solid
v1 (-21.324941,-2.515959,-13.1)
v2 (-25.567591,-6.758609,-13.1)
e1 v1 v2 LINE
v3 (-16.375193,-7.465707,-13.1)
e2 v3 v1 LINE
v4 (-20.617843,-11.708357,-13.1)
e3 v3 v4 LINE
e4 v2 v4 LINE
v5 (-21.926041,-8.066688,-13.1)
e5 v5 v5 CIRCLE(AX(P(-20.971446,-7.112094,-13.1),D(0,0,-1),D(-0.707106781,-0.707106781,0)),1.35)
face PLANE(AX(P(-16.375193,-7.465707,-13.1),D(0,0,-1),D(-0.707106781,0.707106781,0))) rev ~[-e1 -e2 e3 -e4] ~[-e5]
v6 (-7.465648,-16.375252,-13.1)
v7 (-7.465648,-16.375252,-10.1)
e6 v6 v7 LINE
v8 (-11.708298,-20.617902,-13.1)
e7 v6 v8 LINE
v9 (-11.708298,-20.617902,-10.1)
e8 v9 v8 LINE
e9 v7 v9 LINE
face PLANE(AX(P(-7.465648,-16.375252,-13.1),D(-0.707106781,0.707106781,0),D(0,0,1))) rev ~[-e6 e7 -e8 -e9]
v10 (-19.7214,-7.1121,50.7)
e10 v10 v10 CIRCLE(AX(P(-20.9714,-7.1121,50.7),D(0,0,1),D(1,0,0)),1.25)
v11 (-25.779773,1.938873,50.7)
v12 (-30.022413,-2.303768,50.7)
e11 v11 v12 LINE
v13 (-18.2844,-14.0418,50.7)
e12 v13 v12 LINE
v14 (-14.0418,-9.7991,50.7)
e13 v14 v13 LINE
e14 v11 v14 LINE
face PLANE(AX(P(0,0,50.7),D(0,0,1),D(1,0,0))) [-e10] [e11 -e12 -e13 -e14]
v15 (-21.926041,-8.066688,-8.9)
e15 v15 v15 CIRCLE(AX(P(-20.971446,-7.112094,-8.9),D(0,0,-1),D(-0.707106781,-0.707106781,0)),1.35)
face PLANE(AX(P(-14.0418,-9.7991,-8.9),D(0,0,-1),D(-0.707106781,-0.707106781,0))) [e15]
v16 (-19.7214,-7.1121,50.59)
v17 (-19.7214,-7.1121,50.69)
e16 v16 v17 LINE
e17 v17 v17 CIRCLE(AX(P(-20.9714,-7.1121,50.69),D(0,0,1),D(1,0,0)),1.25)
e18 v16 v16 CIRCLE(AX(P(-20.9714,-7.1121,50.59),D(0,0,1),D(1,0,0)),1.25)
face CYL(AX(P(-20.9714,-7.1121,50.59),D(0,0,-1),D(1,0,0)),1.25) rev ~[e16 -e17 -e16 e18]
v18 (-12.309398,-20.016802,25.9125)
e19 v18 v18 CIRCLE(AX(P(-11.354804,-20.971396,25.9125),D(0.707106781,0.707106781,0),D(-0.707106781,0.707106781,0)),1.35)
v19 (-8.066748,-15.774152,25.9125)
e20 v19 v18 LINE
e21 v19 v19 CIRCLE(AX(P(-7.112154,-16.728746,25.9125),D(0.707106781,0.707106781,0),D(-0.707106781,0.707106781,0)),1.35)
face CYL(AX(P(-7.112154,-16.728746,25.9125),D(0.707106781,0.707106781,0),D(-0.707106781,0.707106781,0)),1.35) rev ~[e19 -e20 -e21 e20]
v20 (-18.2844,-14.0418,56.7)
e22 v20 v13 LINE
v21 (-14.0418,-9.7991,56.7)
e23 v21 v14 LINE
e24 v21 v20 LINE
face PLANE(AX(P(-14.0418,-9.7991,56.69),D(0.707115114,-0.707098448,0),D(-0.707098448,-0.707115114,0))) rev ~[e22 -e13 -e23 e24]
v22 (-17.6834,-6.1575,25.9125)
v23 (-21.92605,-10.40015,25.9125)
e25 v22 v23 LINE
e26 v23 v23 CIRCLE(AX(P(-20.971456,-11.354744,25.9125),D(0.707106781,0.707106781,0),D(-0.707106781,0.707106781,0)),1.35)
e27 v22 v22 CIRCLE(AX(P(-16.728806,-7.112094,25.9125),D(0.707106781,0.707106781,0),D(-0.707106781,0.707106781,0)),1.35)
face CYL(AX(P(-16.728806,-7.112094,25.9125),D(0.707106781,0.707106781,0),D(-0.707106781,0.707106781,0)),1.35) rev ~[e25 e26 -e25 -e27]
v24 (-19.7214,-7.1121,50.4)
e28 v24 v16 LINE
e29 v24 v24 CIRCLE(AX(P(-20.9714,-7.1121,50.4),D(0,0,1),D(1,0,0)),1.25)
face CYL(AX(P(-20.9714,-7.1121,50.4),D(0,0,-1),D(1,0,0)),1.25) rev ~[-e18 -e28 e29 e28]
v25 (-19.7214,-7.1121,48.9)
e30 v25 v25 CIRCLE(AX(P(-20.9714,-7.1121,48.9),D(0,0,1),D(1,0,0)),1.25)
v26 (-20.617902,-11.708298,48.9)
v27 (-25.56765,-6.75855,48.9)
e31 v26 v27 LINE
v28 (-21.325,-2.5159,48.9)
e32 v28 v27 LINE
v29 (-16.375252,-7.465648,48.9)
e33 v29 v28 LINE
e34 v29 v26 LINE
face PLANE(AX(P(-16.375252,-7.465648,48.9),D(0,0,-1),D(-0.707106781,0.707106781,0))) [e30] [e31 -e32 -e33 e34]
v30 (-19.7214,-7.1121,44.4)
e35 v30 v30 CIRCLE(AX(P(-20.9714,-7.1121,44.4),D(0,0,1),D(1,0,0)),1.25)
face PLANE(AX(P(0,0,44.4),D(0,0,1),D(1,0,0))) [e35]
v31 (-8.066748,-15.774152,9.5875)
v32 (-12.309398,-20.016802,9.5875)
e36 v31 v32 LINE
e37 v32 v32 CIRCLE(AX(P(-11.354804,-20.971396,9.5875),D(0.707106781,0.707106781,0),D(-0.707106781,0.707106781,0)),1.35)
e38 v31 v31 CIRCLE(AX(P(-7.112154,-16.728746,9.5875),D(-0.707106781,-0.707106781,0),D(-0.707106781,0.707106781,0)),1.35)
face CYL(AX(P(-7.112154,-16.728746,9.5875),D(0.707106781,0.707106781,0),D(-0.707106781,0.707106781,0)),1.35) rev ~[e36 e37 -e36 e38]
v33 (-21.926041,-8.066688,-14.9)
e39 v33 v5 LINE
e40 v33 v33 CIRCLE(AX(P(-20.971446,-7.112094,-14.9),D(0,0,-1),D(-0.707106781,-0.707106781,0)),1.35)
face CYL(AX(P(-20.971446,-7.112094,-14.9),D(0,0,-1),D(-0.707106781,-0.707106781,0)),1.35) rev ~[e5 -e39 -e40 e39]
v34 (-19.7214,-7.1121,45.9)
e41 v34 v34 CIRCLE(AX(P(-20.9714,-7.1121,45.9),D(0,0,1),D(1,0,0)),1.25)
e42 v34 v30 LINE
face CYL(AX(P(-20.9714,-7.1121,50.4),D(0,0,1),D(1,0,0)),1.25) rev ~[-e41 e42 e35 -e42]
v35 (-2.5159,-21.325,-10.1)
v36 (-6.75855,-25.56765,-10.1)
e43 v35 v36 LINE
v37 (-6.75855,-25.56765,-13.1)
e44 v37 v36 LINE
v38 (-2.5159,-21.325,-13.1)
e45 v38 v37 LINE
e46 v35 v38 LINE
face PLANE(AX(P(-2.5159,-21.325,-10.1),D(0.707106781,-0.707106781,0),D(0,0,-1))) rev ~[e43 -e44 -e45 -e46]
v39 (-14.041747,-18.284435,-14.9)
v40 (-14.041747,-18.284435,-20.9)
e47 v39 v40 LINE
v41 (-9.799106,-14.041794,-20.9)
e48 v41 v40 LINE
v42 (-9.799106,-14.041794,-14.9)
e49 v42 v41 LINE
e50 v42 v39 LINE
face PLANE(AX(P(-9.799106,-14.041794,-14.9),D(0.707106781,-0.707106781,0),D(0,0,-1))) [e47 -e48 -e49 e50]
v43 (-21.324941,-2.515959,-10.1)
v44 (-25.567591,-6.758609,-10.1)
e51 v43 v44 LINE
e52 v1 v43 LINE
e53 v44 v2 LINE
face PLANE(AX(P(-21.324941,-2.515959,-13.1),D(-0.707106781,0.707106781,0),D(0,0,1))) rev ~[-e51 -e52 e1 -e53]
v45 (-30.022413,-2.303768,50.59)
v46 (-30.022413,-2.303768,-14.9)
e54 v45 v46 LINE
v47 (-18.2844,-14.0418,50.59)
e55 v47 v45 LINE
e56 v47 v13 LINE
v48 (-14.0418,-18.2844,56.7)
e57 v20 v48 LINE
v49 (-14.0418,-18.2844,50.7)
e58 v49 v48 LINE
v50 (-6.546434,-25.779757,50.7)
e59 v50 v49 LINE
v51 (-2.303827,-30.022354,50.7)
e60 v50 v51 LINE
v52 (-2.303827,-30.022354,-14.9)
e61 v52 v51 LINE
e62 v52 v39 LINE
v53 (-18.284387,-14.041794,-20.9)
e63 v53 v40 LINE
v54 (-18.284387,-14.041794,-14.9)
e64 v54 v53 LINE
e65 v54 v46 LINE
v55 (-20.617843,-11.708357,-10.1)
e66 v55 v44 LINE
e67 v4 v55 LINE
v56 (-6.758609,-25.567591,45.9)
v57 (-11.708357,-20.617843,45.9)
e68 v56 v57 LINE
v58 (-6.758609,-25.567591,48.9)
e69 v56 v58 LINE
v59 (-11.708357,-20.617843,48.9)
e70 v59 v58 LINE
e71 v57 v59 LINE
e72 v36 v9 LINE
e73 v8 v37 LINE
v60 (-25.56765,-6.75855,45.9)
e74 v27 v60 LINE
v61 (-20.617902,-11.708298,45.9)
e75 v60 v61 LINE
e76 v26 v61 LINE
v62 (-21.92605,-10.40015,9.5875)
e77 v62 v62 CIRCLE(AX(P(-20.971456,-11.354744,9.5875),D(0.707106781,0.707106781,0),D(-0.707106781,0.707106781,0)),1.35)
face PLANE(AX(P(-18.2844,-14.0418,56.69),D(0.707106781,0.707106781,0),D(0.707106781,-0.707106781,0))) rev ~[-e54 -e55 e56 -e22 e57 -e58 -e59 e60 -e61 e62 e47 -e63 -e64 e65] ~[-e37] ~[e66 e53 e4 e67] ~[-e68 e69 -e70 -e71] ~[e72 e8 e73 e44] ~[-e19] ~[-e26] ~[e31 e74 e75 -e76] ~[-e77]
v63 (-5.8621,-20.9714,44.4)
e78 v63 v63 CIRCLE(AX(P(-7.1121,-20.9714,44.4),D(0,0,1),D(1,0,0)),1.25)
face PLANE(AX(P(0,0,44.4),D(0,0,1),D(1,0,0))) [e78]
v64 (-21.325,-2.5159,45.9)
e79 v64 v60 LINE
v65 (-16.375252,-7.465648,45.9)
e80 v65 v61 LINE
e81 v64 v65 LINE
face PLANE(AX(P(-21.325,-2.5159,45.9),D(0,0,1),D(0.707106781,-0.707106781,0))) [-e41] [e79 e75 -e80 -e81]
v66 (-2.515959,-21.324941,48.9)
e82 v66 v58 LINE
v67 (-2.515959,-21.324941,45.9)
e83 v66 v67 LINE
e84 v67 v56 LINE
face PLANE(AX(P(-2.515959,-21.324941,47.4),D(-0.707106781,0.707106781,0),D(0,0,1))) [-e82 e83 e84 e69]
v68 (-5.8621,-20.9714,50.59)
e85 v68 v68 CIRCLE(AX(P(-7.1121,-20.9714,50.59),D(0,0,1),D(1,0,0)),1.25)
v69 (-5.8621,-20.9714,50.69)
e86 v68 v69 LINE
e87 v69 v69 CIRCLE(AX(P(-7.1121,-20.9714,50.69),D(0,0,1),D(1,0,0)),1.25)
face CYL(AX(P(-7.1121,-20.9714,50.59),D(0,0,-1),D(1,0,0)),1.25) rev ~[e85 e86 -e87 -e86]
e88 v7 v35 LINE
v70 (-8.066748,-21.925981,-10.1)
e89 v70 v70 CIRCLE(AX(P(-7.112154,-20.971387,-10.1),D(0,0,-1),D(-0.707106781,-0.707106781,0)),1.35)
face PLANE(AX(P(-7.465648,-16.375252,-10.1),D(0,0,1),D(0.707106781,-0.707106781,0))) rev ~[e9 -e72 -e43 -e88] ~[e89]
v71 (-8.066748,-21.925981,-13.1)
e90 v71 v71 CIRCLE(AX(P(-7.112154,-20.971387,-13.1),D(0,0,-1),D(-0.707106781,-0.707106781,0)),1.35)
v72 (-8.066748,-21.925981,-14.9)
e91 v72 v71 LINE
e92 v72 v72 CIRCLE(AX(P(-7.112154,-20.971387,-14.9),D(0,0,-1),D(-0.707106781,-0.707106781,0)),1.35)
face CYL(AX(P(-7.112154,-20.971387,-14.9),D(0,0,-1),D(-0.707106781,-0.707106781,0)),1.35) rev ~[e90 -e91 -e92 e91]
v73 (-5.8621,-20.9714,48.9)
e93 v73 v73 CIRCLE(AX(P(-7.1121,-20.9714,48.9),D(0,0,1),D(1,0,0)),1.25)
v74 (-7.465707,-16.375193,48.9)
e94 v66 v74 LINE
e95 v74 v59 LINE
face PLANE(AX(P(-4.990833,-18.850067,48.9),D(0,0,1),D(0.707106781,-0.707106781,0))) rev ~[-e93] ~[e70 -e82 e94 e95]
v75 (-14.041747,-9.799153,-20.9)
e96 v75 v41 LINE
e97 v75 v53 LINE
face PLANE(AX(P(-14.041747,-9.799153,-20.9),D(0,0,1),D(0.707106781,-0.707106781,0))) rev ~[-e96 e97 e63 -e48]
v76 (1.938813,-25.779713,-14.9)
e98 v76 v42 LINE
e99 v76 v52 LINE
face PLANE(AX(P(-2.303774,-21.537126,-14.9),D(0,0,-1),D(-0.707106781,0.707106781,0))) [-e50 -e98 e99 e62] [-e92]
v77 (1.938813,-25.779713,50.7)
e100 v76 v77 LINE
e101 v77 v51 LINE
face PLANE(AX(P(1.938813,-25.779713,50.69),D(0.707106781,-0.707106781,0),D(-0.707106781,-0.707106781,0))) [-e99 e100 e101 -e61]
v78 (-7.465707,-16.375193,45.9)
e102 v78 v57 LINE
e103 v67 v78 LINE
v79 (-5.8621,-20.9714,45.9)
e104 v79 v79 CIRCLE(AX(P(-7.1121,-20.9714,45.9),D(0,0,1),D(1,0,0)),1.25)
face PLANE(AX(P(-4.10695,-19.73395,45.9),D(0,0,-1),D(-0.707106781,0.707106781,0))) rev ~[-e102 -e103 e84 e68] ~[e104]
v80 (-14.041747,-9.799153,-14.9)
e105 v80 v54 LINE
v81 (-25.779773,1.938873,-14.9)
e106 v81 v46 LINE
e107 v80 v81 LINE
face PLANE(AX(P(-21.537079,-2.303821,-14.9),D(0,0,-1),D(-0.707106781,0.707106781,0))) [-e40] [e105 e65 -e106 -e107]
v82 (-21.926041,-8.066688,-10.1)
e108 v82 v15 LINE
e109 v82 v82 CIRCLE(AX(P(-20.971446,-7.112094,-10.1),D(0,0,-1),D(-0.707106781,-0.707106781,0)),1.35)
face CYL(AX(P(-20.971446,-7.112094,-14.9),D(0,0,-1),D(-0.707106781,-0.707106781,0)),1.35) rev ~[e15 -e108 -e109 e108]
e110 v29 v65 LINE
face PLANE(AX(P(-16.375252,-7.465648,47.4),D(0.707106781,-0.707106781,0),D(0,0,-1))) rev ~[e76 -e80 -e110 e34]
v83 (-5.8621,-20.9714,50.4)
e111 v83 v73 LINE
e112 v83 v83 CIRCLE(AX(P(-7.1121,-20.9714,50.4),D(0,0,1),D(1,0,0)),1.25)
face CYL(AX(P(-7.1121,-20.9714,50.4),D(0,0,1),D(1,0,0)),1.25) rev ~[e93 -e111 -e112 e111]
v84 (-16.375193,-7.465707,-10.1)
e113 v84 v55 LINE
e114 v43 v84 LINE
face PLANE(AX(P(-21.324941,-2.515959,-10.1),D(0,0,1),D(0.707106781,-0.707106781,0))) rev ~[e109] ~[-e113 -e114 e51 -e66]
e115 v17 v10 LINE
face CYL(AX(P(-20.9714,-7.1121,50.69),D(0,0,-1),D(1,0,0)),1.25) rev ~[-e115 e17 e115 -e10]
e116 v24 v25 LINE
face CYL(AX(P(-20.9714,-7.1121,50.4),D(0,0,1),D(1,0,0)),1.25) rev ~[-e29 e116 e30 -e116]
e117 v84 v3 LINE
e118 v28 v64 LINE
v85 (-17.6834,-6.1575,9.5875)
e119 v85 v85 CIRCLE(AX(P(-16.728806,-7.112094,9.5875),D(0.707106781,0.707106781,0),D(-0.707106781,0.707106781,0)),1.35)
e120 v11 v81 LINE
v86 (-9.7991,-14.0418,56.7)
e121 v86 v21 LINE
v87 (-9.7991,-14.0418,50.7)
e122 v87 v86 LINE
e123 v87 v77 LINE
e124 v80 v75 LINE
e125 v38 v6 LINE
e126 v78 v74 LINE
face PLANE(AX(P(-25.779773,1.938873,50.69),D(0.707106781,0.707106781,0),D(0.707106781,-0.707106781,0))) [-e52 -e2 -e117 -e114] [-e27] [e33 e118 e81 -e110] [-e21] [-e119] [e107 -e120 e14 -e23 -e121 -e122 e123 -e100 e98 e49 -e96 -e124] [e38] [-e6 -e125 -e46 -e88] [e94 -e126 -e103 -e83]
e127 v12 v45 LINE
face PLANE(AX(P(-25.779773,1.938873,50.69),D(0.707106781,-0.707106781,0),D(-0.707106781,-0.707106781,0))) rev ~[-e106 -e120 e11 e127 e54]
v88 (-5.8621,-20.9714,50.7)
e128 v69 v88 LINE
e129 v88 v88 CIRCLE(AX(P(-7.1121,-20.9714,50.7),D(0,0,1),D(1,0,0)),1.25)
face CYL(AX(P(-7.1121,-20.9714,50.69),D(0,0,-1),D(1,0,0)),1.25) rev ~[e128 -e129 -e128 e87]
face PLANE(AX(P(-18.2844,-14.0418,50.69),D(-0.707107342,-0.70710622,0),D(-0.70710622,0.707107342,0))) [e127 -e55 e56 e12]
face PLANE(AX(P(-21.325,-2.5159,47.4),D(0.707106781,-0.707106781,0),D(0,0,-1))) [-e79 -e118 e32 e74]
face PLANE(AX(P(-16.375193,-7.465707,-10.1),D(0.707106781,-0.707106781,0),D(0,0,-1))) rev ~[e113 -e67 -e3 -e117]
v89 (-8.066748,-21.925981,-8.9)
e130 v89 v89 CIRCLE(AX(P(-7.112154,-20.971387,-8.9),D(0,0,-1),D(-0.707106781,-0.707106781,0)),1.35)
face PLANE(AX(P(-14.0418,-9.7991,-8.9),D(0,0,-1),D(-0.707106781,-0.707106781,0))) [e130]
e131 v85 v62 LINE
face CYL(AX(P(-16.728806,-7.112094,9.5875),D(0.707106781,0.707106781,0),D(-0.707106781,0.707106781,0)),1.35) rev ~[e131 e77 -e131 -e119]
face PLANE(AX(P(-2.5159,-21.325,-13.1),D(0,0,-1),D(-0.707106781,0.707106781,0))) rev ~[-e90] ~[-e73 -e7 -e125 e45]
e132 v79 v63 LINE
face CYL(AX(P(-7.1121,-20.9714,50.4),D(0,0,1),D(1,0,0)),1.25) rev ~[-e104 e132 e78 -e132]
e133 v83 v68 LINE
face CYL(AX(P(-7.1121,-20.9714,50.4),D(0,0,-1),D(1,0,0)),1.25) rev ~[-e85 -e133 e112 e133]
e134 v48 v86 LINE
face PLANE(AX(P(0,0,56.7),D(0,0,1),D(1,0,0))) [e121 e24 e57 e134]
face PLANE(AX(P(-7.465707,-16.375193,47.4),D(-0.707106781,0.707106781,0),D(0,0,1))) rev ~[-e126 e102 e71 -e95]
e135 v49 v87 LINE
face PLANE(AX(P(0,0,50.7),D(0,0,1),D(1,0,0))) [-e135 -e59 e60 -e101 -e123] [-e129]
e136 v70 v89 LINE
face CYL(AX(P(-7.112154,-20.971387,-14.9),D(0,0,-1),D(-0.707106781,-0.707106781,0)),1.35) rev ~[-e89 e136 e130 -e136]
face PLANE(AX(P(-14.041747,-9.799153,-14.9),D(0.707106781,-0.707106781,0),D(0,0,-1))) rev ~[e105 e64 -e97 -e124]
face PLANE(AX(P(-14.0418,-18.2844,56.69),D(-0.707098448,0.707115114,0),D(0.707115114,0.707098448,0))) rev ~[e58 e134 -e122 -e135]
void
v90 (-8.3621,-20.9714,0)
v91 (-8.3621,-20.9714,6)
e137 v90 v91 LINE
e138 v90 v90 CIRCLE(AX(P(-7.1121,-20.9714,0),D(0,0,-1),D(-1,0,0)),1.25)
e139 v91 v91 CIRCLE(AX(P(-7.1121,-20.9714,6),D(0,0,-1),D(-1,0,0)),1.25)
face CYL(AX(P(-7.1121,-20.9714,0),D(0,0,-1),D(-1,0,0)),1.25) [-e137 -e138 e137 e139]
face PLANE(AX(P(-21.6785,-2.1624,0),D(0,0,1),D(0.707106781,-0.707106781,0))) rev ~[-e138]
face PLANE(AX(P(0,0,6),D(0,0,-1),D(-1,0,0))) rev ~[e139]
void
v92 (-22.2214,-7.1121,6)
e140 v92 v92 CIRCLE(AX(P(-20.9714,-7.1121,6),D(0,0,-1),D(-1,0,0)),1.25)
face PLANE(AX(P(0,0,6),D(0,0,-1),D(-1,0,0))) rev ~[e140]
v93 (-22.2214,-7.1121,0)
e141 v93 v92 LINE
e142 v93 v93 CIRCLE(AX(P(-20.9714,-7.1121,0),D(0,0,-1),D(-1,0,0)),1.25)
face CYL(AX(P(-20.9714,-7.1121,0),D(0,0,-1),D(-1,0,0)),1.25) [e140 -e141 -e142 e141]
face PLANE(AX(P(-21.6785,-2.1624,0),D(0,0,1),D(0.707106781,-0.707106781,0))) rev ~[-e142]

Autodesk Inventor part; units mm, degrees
ref_plane "YZ Plane" through (0, 0, 0) normal (1, 0, 0) x (0, 1, 0)
ref_plane "XZ Plane" through (0, 0, 0) normal (0, 1, 0) x (-1, 0, 0)
ref_plane "XY Plane" through (0, 0, 0) normal (0, 0, 1) x (1, 0, 0)
sketch "스케치1" plane through (0, 0, 0) normal (0, 0, 1) x (1, 0, 0)
  arc A0 (25.8359, 13.6528) -> (21.7064, 16.0915) centre (22.8544, 13.3199) ccw projected
  line L0 (21.1279, 15.8519) -> (21.7064, 16.0915) projected
  arc A1 (21.1279, 15.8519) -> (19.2893, 12.7982) centre (22.276, 13.0803) ccw projected
  arc A2 (12.7982, 19.2893) -> (19.2893, 12.7982) centre (12.1212, 12.1212) ccw projected
  arc A3 (12.7982, 19.2893) -> (15.8519, 21.1279) centre (13.0803, 22.276) ccw projected
  line L1 (16.0915, 21.7064) -> (15.8519, 21.1279) projected
  arc A4 (16.0915, 21.7064) -> (13.6528, 25.8359) centre (13.3199, 22.8544) ccw projected
  arc A5 (13.6528, 25.8359) -> (2.3631, 21.8792) centre (12.1212, 12.1212) ccw projected
  line L2 (-25.9212, -6.405) -> (2.3631, 21.8792) projected
  line L3 (-18.2844, -14.0418) -> (-25.9212, -6.405) projected
  line L4 (-14.0418, -9.7991) -> (-18.2844, -14.0418) projected
  line L5 (-9.7991, -14.0418) -> (-14.0418, -9.7991) projected
  line L6 (-14.0418, -18.2844) -> (-9.7991, -14.0418) projected
  line L7 (-6.405, -25.9212) -> (-14.0418, -18.2844) projected
  line L8 (21.8792, 2.3631) -> (-6.405, -25.9212) projected
  arc A6 (21.8792, 2.3631) -> (25.8359, 13.6528) centre (12.1212, 12.1212) ccw projected
  circle A7 centre (23.1212, 12.1212) radius 1.2812 projected
  circle A8 centre (19.8993, 4.343) radius 1.2812 projected
  circle A9 centre (1.1212, 12.1212) radius 1.2812 projected
  circle A10 centre (12.1212, 1.1212) radius 1.2812 projected
  circle A11 centre (4.343, 4.343) radius 1.2812 projected
  circle A12 centre (4.343, 19.8993) radius 1.2812 projected
  circle A13 centre (12.1212, 23.1212) radius 1.2812 projected
  circle A14 centre (-7.1121, -20.9714) radius 1.25 projected
  circle A15 centre (-20.9714, -7.1121) radius 1.25 projected
  line L9 (-25.9212, -6.405) -> (-18.2844, -14.0418)
  line L10 (-14.0418, -9.7991) -> (-18.2844, -14.0418)
  line L11 (-14.0418, -9.7991) -> (-9.7991, -14.0418)
  line L12 (-14.0418, -18.2844) -> (-9.7991, -14.0418)
  line L13 (-21.6785, -2.1624) -> (-14.0418, -9.7991)
  line L14 (-21.6785, -2.1624) -> (-25.9212, -6.405)
  line L15 (-9.7991, -14.0418) -> (-2.1624, -21.6785)
  line L16 (-2.1624, -21.6785) -> (-6.405, -25.9212)
  line L17 (-6.405, -25.9212) -> (-14.0418, -18.2844)
  line L18 (-18.2844, -14.0418) -> (-14.0418, -18.2844)
  point P0 (0, 0)
extrude "돌출1" add sketch "스케치1" along normal blind 50.4 contours L8 L7 L6 L15 | L6 L18 L4 L5 | L4 L3 L2 L13 | A14 | A15
sketch "스케치2" plane through (0, 0, 0) normal (0, 0, -1) x (-1, 0, 0)
  line L0 (2.1624, -21.6785) -> (21.6785, -2.1624) projected
  arc A0 (-21.7064, 16.0915) -> (-25.8359, 13.6528) centre (-22.8544, 13.3199) ccw projected
  arc A1 (-25.8359, 13.6528) -> (-21.8792, 2.3631) centre (-12.1212, 12.1212) ccw projected
  line L1 (-21.8792, 2.3631) -> (6.405, -25.9212) projected
  line L2 (6.405, -25.9212) -> (14.0418, -18.2844) projected
  line L3 (14.0418, -18.2844) -> (9.7991, -14.0418) projected
  line L4 (9.7991, -14.0418) -> (14.0418, -9.7991) projected
  line L5 (14.0418, -9.7991) -> (18.2844, -14.0418) projected
  line L6 (18.2844, -14.0418) -> (25.9212, -6.405) projected
  line L7 (25.9212, -6.405) -> (-2.3631, 21.8792) projected
  arc A2 (-2.3631, 21.8792) -> (-13.6528, 25.8359) centre (-12.1212, 12.1212) ccw projected
  arc A3 (-13.6528, 25.8359) -> (-16.0915, 21.7064) centre (-13.3199, 22.8544) ccw projected
  line L8 (-16.0915, 21.7064) -> (-15.8519, 21.1279) projected
  arc A4 (-15.8519, 21.1279) -> (-12.7982, 19.2893) centre (-13.0803, 22.276) ccw projected
  arc A5 (-19.2893, 12.7982) -> (-12.7982, 19.2893) centre (-12.1212, 12.1212) ccw projected
  arc A6 (-19.2893, 12.7982) -> (-21.1279, 15.8519) centre (-22.276, 13.0803) ccw projected
  line L9 (-21.1279, 15.8519) -> (-21.7064, 16.0915) projected
  circle A7 centre (-23.1212, 12.1212) radius 1.2812 projected
  circle A8 centre (-19.8993, 4.343) radius 1.2812 projected
  circle A9 centre (-1.1212, 12.1212) radius 1.2812 projected
  circle A10 centre (-12.1212, 1.1212) radius 1.2812 projected
  circle A11 centre (-4.343, 4.343) radius 1.2812 projected
  circle A12 centre (-4.343, 19.8993) radius 1.2812 projected
  circle A13 centre (-12.1212, 23.1212) radius 1.2812 projected
  circle A14 centre (7.1121, -20.9714) radius 1.25 projected
  circle A15 centre (20.9714, -7.1121) radius 1.25 projected
  line L10 (25.9212, -6.405) -> (6.405, -25.9212) projected
  point P0 (0, 0)
extrude "돌출2" add sketch "스케치2" along normal blind 6 contours L0 L5 L10 L3
sketch "스케치3" plane through (0, 0, 50.4) normal (0, 0, 1) x (1, 0, 0)
  arc A0 (25.8359, 13.6528) -> (21.7064, 16.0915) centre (22.8544, 13.3199) ccw projected
  line L0 (21.1279, 15.8519) -> (21.7064, 16.0915) projected
  arc A1 (21.1279, 15.8519) -> (19.2893, 12.7982) centre (22.276, 13.0803) ccw projected
  arc A2 (12.7982, 19.2893) -> (19.2893, 12.7982) centre (12.1212, 12.1212) ccw projected
  arc A3 (12.7982, 19.2893) -> (15.8519, 21.1279) centre (13.0803, 22.276) ccw projected
  line L1 (16.0915, 21.7064) -> (15.8519, 21.1279) projected
  arc A4 (16.0915, 21.7064) -> (13.6528, 25.8359) centre (13.3199, 22.8544) ccw projected
  arc A5 (13.6528, 25.8359) -> (2.3631, 21.8792) centre (12.1212, 12.1212) ccw projected
  line L2 (-25.9212, -6.405) -> (2.3631, 21.8792) projected
  line L3 (-18.2844, -14.0418) -> (-25.9212, -6.405) projected
  line L4 (-14.0418, -9.7991) -> (-18.2844, -14.0418) projected
  line L5 (-9.7991, -14.0418) -> (-14.0418, -9.7991) projected
  line L6 (-14.0418, -18.2844) -> (-9.7991, -14.0418) projected
  line L7 (-6.405, -25.9212) -> (-14.0418, -18.2844) projected
  line L8 (21.8792, 2.3631) -> (-6.405, -25.9212) projected
  arc A6 (21.8792, 2.3631) -> (25.8359, 13.6528) centre (12.1212, 12.1212) ccw projected
  circle A7 centre (23.1212, 12.1212) radius 1.2812 projected
  circle A8 centre (19.8993, 4.343) radius 1.2812 projected
  circle A9 centre (1.1212, 12.1212) radius 1.2812 projected
  circle A10 centre (12.1212, 1.1212) radius 1.2812 projected
  circle A11 centre (4.343, 4.343) radius 1.2812 projected
  circle A12 centre (4.343, 19.8993) radius 1.2812 projected
  circle A13 centre (12.1212, 23.1212) radius 1.2812 projected
  circle A14 centre (-7.1121, -20.9714) radius 1.25 projected
  circle A15 centre (-20.9714, -7.1121) radius 1.25 projected
  line L9 (-25.9212, -6.405) -> (-6.405, -25.9212) projected
  point P0 (0, 0)
extrude "돌출3" add sketch "스케치3" along normal blind 6 contours L9 L4 L5 L6
sketch "스케치4" plane through (0, 0, 0) normal (0, 0, -1) x (-1, 0, 0)
  arc A0 (-21.7064, 16.0915) -> (-25.8359, 13.6528) centre (-22.8544, 13.3199) ccw projected
  arc A1 (-25.8359, 13.6528) -> (-21.8792, 2.3631) centre (-12.1212, 12.1212) ccw projected
  line L0 (-21.8792, 2.3631) -> (6.405, -25.9212) projected
  line L1 (6.405, -25.9212) -> (14.0418, -18.2844) projected
  line L2 (14.0418, -18.2844) -> (9.7991, -14.0418) projected
  line L3 (9.7991, -14.0418) -> (14.0418, -9.7991) projected
  line L4 (14.0418, -9.7991) -> (18.2844, -14.0418) projected
  line L5 (18.2844, -14.0418) -> (25.9212, -6.405) projected
  line L6 (25.9212, -6.405) -> (-2.3631, 21.8792) projected
  arc A2 (-2.3631, 21.8792) -> (-13.6528, 25.8359) centre (-12.1212, 12.1212) ccw projected
  arc A3 (-13.6528, 25.8359) -> (-16.0915, 21.7064) centre (-13.3199, 22.8544) ccw projected
  line L7 (-16.0915, 21.7064) -> (-15.8519, 21.1279) projected
  arc A4 (-15.8519, 21.1279) -> (-12.7982, 19.2893) centre (-13.0803, 22.276) ccw projected
  arc A5 (-19.2893, 12.7982) -> (-12.7982, 19.2893) centre (-12.1212, 12.1212) ccw projected
  arc A6 (-19.2893, 12.7982) -> (-21.1279, 15.8519) centre (-22.276, 13.0803) ccw projected
  line L8 (-21.1279, 15.8519) -> (-21.7064, 16.0915) projected
  circle A7 centre (-23.1212, 12.1212) radius 1.2812 projected
  circle A8 centre (-19.8993, 4.343) radius 1.2812 projected
  circle A9 centre (-1.1212, 12.1212) radius 1.2812 projected
  circle A10 centre (-12.1212, 1.1212) radius 1.2812 projected
  circle A11 centre (-4.343, 4.343) radius 1.2812 projected
  circle A12 centre (-4.343, 19.8993) radius 1.2812 projected
  circle A13 centre (-12.1212, 23.1212) radius 1.2812 projected
  circle A14 centre (7.1121, -20.9714) radius 1.25 projected
  circle A15 centre (20.9714, -7.1121) radius 1.25 projected
  point P0 (0, 0)
extrude "돌출4" cut sketch "스케치4" against normal blind 6 contours A14 | A15
sketch "스케치5" plane through (0, 0, 50.4) normal (0, 0, 1) x (1, 0, 0)
  arc A0 (25.8359, 13.6528) -> (21.7064, 16.0915) centre (22.8544, 13.3199) ccw projected
  line L0 (21.1279, 15.8519) -> (21.7064, 16.0915) projected
  arc A1 (21.1279, 15.8519) -> (19.2893, 12.7982) centre (22.276, 13.0803) ccw projected
  arc A2 (12.7982, 19.2893) -> (19.2893, 12.7982) centre (12.1212, 12.1212) ccw projected
  arc A3 (12.7982, 19.2893) -> (15.8519, 21.1279) centre (13.0803, 22.276) ccw projected
  line L1 (16.0915, 21.7064) -> (15.8519, 21.1279) projected
  arc A4 (16.0915, 21.7064) -> (13.6528, 25.8359) centre (13.3199, 22.8544) ccw projected
  arc A5 (13.6528, 25.8359) -> (2.3631, 21.8792) centre (12.1212, 12.1212) ccw projected
  line L2 (-25.9212, -6.405) -> (2.3631, 21.8792) projected
  line L3 (-18.2844, -14.0418) -> (-25.9212, -6.405) projected
  line L4 (-14.0418, -9.7991) -> (-18.2844, -14.0418) projected
  line L5 (-9.7991, -14.0418) -> (-14.0418, -9.7991) projected
  line L6 (-14.0418, -18.2844) -> (-9.7991, -14.0418) projected
  line L7 (-6.405, -25.9212) -> (-14.0418, -18.2844) projected
  line L8 (21.8792, 2.3631) -> (-6.405, -25.9212) projected
  arc A6 (21.8792, 2.3631) -> (25.8359, 13.6528) centre (12.1212, 12.1212) ccw projected
  circle A7 centre (23.1212, 12.1212) radius 1.2812 projected
  circle A8 centre (19.8993, 4.343) radius 1.2812 projected
  circle A9 centre (1.1212, 12.1212) radius 1.2812 projected
  circle A10 centre (12.1212, 1.1212) radius 1.2812 projected
  circle A11 centre (4.343, 4.343) radius 1.2812 projected
  circle A12 centre (4.343, 19.8993) radius 1.2812 projected
  circle A13 centre (12.1212, 23.1212) radius 1.2812 projected
  circle A14 centre (-7.1121, -20.9714) radius 1.25 projected
  circle A15 centre (-20.9714, -7.1121) radius 1.25 projected
  point P0 (0, 0)
extrude "돌출5" cut sketch "스케치5" against normal blind 6 contours A14 | A15
sketch "스케치16" plane through (-21.6785, -2.1624, 0) normal (0.7071068, 0.7071068, 0) x (-0.7071068, 0.7071068, 0)
  line L0 (-27.4, -20.9) -> (-27.4, -14.9) projected
  line L1 (-27.4, -14.9) -> (-17.8, -14.9) projected
  line L2 (-17.8, -14.9) -> (-17.8, -20.9) projected
  line L3 (-27.4, -20.9) -> (-17.8, -20.9) projected
  line L4 (0, 0) -> (0, 50.4) projected
  line L5 (-27.4, -14.9) -> (0, -14.9)
  line L6 (0, -14.9) -> (0, 0)
  line L7 (0, 0) -> (-27.4, 0)
  line L8 (-27.4, 0) -> (-27.4, -14.9)
  line L9 (-0.2, -14.9) -> (-0.2, -20.9) projected
  line L10 (-9.8, -20.9) -> (-0.2, -20.9) projected
  line L11 (-9.8, -20.9) -> (-9.8, -14.9) projected
  line L12 (-9.8, -14.9) -> (-0.2, -14.9) projected
  line L13 (-16.9, -20.9) -> (-16.9, -14.9) projected
  line L14 (-10.7, -20.9) -> (-10.7, -14.9) projected
  line L15 (-16.9, -14.9) -> (-10.7, -14.9)
  line L16 (-10.7, -14.9) -> (-10.7, -20.9)
  line L17 (-10.7, -20.9) -> (-16.9, -20.9)
  line L18 (-16.9, -20.9) -> (-16.9, -14.9)
  line L19 (-16.9, -14.9) -> (-16.8, -14.9)
  line L20 (-10.7, -14.9) -> (-10.8, -14.9)
  line L21 (-10.8, -14.9) -> (-10.8, -21)
  line L22 (-16.8, -14.9) -> (-16.8, -20.9)
  point P0 (-13.8, 0)
  point P1 (-16.8, -14.9)
  point P2 (-10.8, -20.9)
  dimension "d25" = 0.1
  dimension "d26" = 0.1
extrude "돌출11" add sketch "스케치16" against normal blind 6 contours L8 L7 L6 L5 L1 | L5 L21 L17 L22
sketch "스케치17" plane through (-14.0418, -9.7991, -14.9) normal (0, 0, -1) x (-0.7071068, -0.7071068, 0)
  line L0 (6, 10.6) -> (-34, 10.6) projected
  arc A0 (-34, 10.6) -> (-45.0739, 4.8949) centre (-34, -3) ccw projected
  arc A1 (-45.0739, 4.8949) -> (-43.6082, 2.05) centre (-43.6082, 3.85) ccw projected
  line L1 (-43.6082, 2.05) -> (-34, 2.05) projected
  arc A2 (-34, -8.05) -> (-34, 2.05) centre (-34, -3) ccw projected
  line L2 (-34, -8.05) -> (-43.6082, -8.05) projected
  arc A3 (-43.6082, -8.05) -> (-45.0739, -10.8949) centre (-43.6082, -9.85) ccw projected
  arc A4 (-45.0739, -10.8949) -> (-34, -16.6) centre (-34, -3) ccw projected
  line L3 (-34, -16.6) -> (6, -16.6) projected
  line L4 (6, -16.6) -> (6, -7) projected
  arc A5 (5.005, -6.1) -> (6, -7) centre (6, -6) ccw projected
  line L5 (5.005, -6.1) -> (0.995, -6.1) projected
  arc A6 (-0.1, -5.005) -> (0.995, -6.1) centre (0, -6) ccw projected
  line L6 (-0.1, -5.005) -> (-0.1, -0.995) projected
  arc A7 (0.995, 0.1) -> (-0.1, -0.995) centre (0, 0) ccw projected
  line L7 (0.995, 0.1) -> (5.005, 0.1) projected
  arc A8 (6, 1) -> (5.005, 0.1) centre (6, 0) ccw projected
  line L8 (6, 1) -> (6, 10.6) projected
  circle A9 centre (-34, -14) radius 1.2812 projected
  circle A10 centre (-41.7782, -10.7782) radius 1.2812 projected
  circle A11 centre (-23, -3) radius 1.2812 projected
  circle A12 centre (-26.2218, 4.7782) radius 1.2812 projected
  circle A13 centre (-26.2218, -10.7782) radius 1.2812 projected
  circle A14 centre (-34, 8) radius 1.2812 projected
  circle A15 centre (-41.7782, 4.7782) radius 1.2812 projected
  circle A16 centre (3, 6.8) radius 1.35
  circle A17 centre (3, -12.8) radius 1.35
  point P0 (-16.8581, -3)
extrude "돌출12" cut sketch "스케치17" against normal blind 6 contours A16 | A17
sketch "스케치18" plane through (0, 0, 50.4) normal (0, 0, 1) x (1, 0, 0)
  line L0 (2.5045, 21.7378) -> (-25.7798, -6.5464) projected
  line L1 (-18.9915, -13.3347) -> (-25.7798, -6.5464) projected
  arc A0 (-17.6516, -13.2675) -> (-18.9915, -13.3347) centre (-18.2844, -14.0418) ccw projected
  line L2 (-17.6516, -13.2675) -> (-14.8161, -10.432) projected
  arc A1 (-13.2675, -10.432) -> (-14.8161, -10.432) centre (-14.0418, -9.7991) ccw projected
  line L3 (-13.2675, -10.432) -> (-10.432, -13.2675) projected
  arc A2 (-10.432, -14.8161) -> (-10.432, -13.2675) centre (-9.7991, -14.0418) ccw projected
  line L4 (-10.432, -14.8161) -> (-13.2675, -17.6516) projected
  arc A3 (-13.3347, -18.9915) -> (-13.2675, -17.6516) centre (-14.0418, -18.2844) ccw projected
  line L5 (-6.5464, -25.7798) -> (-13.3347, -18.9915) projected
  line L6 (-6.5464, -25.7798) -> (21.7378, 2.5045) projected
  arc A4 (21.7378, 2.5045) -> (25.5341, 14.369) centre (12.1212, 12.1212) ccw projected
  arc A5 (25.5341, 14.369) -> (22.4861, 15.3443) centre (23.7589, 14.0715) ccw projected
  line L7 (22.4861, 15.3443) -> (15.6921, 8.5503) projected
  arc A6 (8.5503, 15.6921) -> (15.6921, 8.5503) centre (12.1212, 12.1212) ccw projected
  line L8 (8.5503, 15.6921) -> (15.3443, 22.4861) projected
  arc A7 (15.3443, 22.4861) -> (14.369, 25.5341) centre (14.0715, 23.7589) ccw projected
  arc A8 (14.369, 25.5341) -> (2.5045, 21.7378) centre (12.1212, 12.1212) ccw projected
  circle A9 centre (-7.1121, -20.9714) radius 1.25 projected
  circle A10 centre (12.1212, 23.1212) radius 1.2812 projected
  circle A11 centre (4.343, 19.8993) radius 1.2812 projected
  circle A12 centre (12.1212, 1.1212) radius 1.2812 projected
  circle A13 centre (1.1212, 12.1212) radius 1.2812 projected
  circle A14 centre (4.343, 4.343) radius 1.2812 projected
  circle A15 centre (23.1212, 12.1212) radius 1.2812 projected
  circle A16 centre (19.8993, 4.343) radius 1.2812 projected
  circle A17 centre (-20.9714, -7.1121) radius 1.25 projected
  circle A18 centre (-20.9714, -7.1121) radius 1.25 projected
  line L9 (-18.2844, -14.0418) -> (-14.0418, -9.7991) projected
  line L10 (-14.0418, -9.7991) -> (-21.6785, -2.1624) projected
  line L11 (-21.6785, -2.1624) -> (-25.9212, -6.405) projected
  line L12 (-25.9212, -6.405) -> (-18.2844, -14.0418) projected
  circle A19 centre (-7.1121, -20.9714) radius 1.25 projected
  line L13 (-9.7991, -14.0418) -> (-14.0418, -18.2844) projected
  line L14 (-14.0418, -18.2844) -> (-6.405, -25.9212) projected
  line L15 (-6.405, -25.9212) -> (-2.1624, -21.6785) projected
  line L16 (-2.1624, -21.6785) -> (-9.7991, -14.0418) projected
  point P0 (0, 0)
  point P1 (-21.5371, -2.3038)
  point P2 (-2.3038, -21.5371)
extrude "돌출13" cut sketch "스케치18" against normal through all contours L0 L12 L11 L10 | L16 L15 L14 L6
sketch "스케치20" plane through (-14.0418, -9.7991, 50.4) normal (0.7071068, 0.7071068, 0) x (-0.7071068, 0.7071068, 0)
  line L0 (10.6, -65.3) -> (10.6, 0) projected
  line L1 (0, 0) -> (10.6, 0) projected
  line L2 (0, 0) -> (0, 6) projected
  line L3 (-6, 6) -> (0, 6) projected
  line L4 (-6, 0) -> (-6, 6) projected
  line L5 (-16.6, 0) -> (-6, 0) projected
  line L6 (-16.6, 0) -> (-16.6, -65.3) projected
  line L7 (-16.6, -65.3) -> (-6, -65.3) projected
  line L8 (-6, -65.3) -> (-6, -71.3) projected
  line L9 (-6, -71.3) -> (0, -71.3) projected
  line L10 (0, -71.3) -> (0, -65.3) projected
  line L11 (0, -65.3) -> (10.6, -65.3) projected
  line L12 (-16.6, 0) -> (-16.6, -65.3) projected
  line L13 (-16.6, -32.65) -> (10.6, -32.65)
  line L14 (-3, 6) -> (-3, -71.3)
  line L15 (-3, -32.65) -> (-3, 0)
  line L16 (-5.005, 0) -> (-0.995, 0) projected
  line L17 (-3, 0) -> (-3, -32.65)
  line L18 (-6, -65.3) -> (0, -65.3)
  line L19 (-3, -65.3) -> (-3, -32.65)
  line L20 (-3, -48.975) -> (-16.6, -48.975)
  line L21 (-16.6, -65.3) -> (-16.6, 0) projected
  line L22 (-3, -48.975) -> (-3, -32.65)
  line L23 (-3, -40.8125) -> (-16.6, -40.8125)
  circle A0 centre (-9.8, -40.8125) radius 1.35
  circle A1 centre (3.8, -40.8125) radius 1.35
  circle A2 centre (-9.8, -24.4875) radius 1.35
  circle A3 centre (3.8, -24.4875) radius 1.35
  point P0 (-3, -50.4)
  dimension "d33" = 2.7
extrude "돌출14" cut sketch "스케치20" against normal up to next contours A0 L23 | L23 A0 | A1 | A2 | A3
sketch "스케치21" plane through (-14.0418, -9.7991, 50.4) normal (0.7071068, 0.7071068, 0) x (-0.7071068, 0.7071068, 0)
  circle A0 centre (3.8, -24.4875) radius 1.35 projected
  circle A1 centre (-9.8, -24.4875) radius 1.35 projected
  circle A2 centre (3.8, -40.8125) radius 1.35 projected
  circle A3 centre (-9.8, -40.8125) radius 1.35 projected
  line L0 (10.6, -65.3) -> (10.6, 0) projected
  line L1 (0, 0) -> (10.6, 0) projected
  line L2 (0, 0) -> (0, 6) projected
  line L3 (-6, 6) -> (0, 6) projected
  line L4 (-6, 0) -> (-6, 6) projected
  line L5 (-16.6, 0) -> (-6, 0) projected
  line L6 (-16.6, 0) -> (-16.6, -65.3) projected
  line L7 (-16.6, -65.3) -> (-6, -65.3) projected
  line L8 (-6, -65.3) -> (-6, -71.3) projected
  line L9 (-6, -71.3) -> (0, -71.3) projected
  line L10 (0, -71.3) -> (0, -65.3) projected
  line L11 (0, -65.3) -> (10.6, -65.3) projected
  line L12 (-11.55, 0) -> (-11.55, 6)
  line L13 (-11.55, 0) -> (-11.55, 6)
  line L14 (-14.05, 0) -> (-14.05, 6)
  line L15 (-14.05, -6) -> (-11.55, -6) projected
  line L16 (-11.55, 0) -> (-14.05, 0)
  line L17 (-14.05, 0) -> (-14.05, -6)
  line L18 (-14.05, -6) -> (-11.55, -6)
  line L19 (-11.55, -6) -> (-11.55, 0)
  line L20 (-12.8, -6) -> (-12.8, 0)
  line L21 (-12.8, -3) -> (-9.3, -3)
  line L22 (-12.8, -3) -> (-16.3, -3)
  line L23 (-9.3, -3) -> (-9.3, -4.5)
  line L24 (-9.3, -3) -> (-9.3, -1.5)
  line L25 (-16.3, -3) -> (-16.3, -4.5)
  line L26 (-16.3, -3) -> (-16.3, -1.5)
  line L27 (-9.3, -1.5) -> (-16.3, -1.5)
  line L28 (-16.3, -1.5) -> (-16.3, -4.5)
  line L29 (-16.3, -4.5) -> (-9.3, -4.5)
  line L30 (-9.3, -4.5) -> (-9.3, -1.5)
  line L31 (-3, 6) -> (-3, 1)
  line L32 (6.8, -3) -> (3.3, -3)
  line L33 (6.8, -3) -> (10.3, -3)
  line L34 (3.3, -3) -> (3.3, -4.5)
  line L35 (3.3, -3) -> (3.3, -1.5)
  line L36 (10.3, -3) -> (10.3, -4.5)
  line L37 (10.3, -3) -> (10.3, -1.5)
  line L38 (3.3, -1.5) -> (10.3, -1.5)
  line L39 (10.3, -1.5) -> (10.3, -4.5)
  line L40 (10.3, -4.5) -> (3.3, -4.5)
  line L41 (3.3, -4.5) -> (3.3, -1.5)
  line L42 (10.6, -32.65) -> (-16.6, -32.65)
  line L43 (-14.05, -59.3) -> (-11.55, -59.3)
  line L44 (-14.05, -59.3) -> (-11.55, -59.3)
  line L45 (-12.8, -62.3) -> (-9.3, -62.3)
  line L46 (-12.8, -62.3) -> (-16.3, -62.3)
  line L47 (-9.3, -62.3) -> (-9.3, -60.8)
  line L48 (-9.3, -62.3) -> (-9.3, -63.8)
  line L49 (-16.3, -62.3) -> (-16.3, -60.8)
  line L50 (-16.3, -62.3) -> (-16.3, -63.8)
  line L51 (-9.3, -63.8) -> (-16.3, -63.8)
  line L52 (-16.3, -63.8) -> (-16.3, -60.8)
  line L53 (-16.3, -60.8) -> (-9.3, -60.8)
  line L54 (-9.3, -60.8) -> (-9.3, -63.8)
  line L55 (10.3, -60.8) -> (3.3, -60.8)
  line L56 (10.3, -62.3) -> (10.3, -60.8)
  line L57 (3.3, -62.3) -> (3.3, -60.8)
  line L58 (6.8, -62.3) -> (3.3, -62.3)
  line L59 (6.8, -62.3) -> (10.3, -62.3)
  line L60 (3.3, -62.3) -> (3.3, -63.8)
  line L61 (3.3, -60.8) -> (3.3, -63.8)
  line L62 (3.3, -63.8) -> (10.3, -63.8)
  line L63 (10.3, -62.3) -> (10.3, -63.8)
  line L64 (10.3, -63.8) -> (10.3, -60.8)
  line L65 (10.6, 0) -> (16.6, 0)
  line L66 (16.6, 0) -> (16.6, -65.3)
  line L67 (16.6, -65.3) -> (10.6, -65.3)
  line L68 (10.6, -65.3) -> (10.6, 0)
  line L69 (-16.6, 0) -> (-22.6, 0)
  line L70 (-22.6, 0) -> (-22.6, -65.3)
  line L71 (-22.6, -65.3) -> (-16.6, -65.3)
  line L72 (-16.6, -65.3) -> (-16.6, 0)
  point P0 (-3, -50.4)
  point P1 (-16.3, -1.5)
  point P2 (-9.3, -4.5)
  point P3 (3.3, -4.5)
  point P4 (10.3, -1.5)
  point P5 (-12.8, -59.3)
  dimension "d36" = 3.5
  dimension "d37" = 3.5
  dimension "d38" = 1.5
  dimension "d39" = 1.5
  dimension "d40" = 1.5
  dimension "d43" = 6
  dimension "d44" = 6
extrude "돌출15" cut sketch "스케치21" against normal up to next contours L27 L20 L22 L17 | L17 L22 L26 L27 | L27 L19 L21 L20 | L22 L20 L29 L17 | L17 L29 L25 L22 | L27 L24 L21 L19 | L21 L19 L29 L20 | L21 L23 L29 L19 | L33 L36 L40 L34 L32 | L32 L35 L38 L37 L33
sketch "스케치22" plane through (-14.0418, -9.7991, 50.4) normal (0.7071068, 0.7071068, 0) x (-0.7071068, 0.7071068, 0)
  line L0 (-9.3, -4.5) -> (-16.3, -4.5) projected
  line L1 (-16.3, -4.5) -> (-16.3, -1.5) projected
  line L2 (-16.3, -1.5) -> (-9.3, -1.5) projected
  line L3 (-9.3, -1.5) -> (-9.3, -4.5) projected
  line L4 (3.3, -1.5) -> (10.3, -1.5) projected
  line L5 (10.3, -1.5) -> (10.3, -4.5) projected
  line L6 (10.3, -4.5) -> (3.3, -4.5) projected
  line L7 (3.3, -4.5) -> (3.3, -1.5) projected
  circle A0 centre (3.8, -24.4875) radius 1.35 projected
  circle A1 centre (-9.8, -24.4875) radius 1.35 projected
  circle A2 centre (3.8, -40.8125) radius 1.35 projected
  circle A3 centre (-9.8, -40.8125) radius 1.35 projected
  line L8 (10.6, -65.3) -> (10.6, 0) projected
  line L9 (0, 0) -> (10.6, 0) projected
  line L10 (0, 0) -> (0, 6) projected
  line L11 (-6, 6) -> (0, 6) projected
  line L12 (-6, 0) -> (-6, 6) projected
  line L13 (-16.6, 0) -> (-6, 0) projected
  line L14 (-16.6, 0) -> (-16.6, -65.3) projected
  line L15 (-16.6, -65.3) -> (-6, -65.3) projected
  line L16 (-6, -65.3) -> (-6, -71.3) projected
  line L17 (-6, -71.3) -> (0, -71.3) projected
  line L18 (0, -71.3) -> (0, -65.3) projected
  line L19 (0, -65.3) -> (10.6, -65.3) projected
  line L20 (10.6, -65.3) -> (10.6, 0) projected
  line L21 (10.6, -32.65) -> (-17.5141, -32.65)
  line L22 (-9.3, -60.8) -> (-16.3, -60.8)
  line L23 (-16.3, -60.8) -> (-16.3, -63.8)
  line L24 (-16.3, -63.8) -> (-9.3, -63.8)
  line L25 (-9.3, -63.8) -> (-9.3, -60.8)
  line L26 (3.3, -63.8) -> (10.3, -63.8)
  line L27 (10.3, -63.8) -> (10.3, -60.8)
  line L28 (10.3, -60.8) -> (3.3, -60.8)
  line L29 (3.3, -60.8) -> (3.3, -63.8)
  line L30 (10.6, 0) -> (16.6, 0)
  line L31 (16.6, 0) -> (16.6, -65.3)
  line L32 (16.6, -65.3) -> (10.6, -65.3)
  line L33 (10.6, -65.3) -> (10.6, 0)
  line L34 (-16.6, 0) -> (-22.6, 0)
  line L35 (-22.6, 0) -> (-22.6, -65.3)
  line L36 (-22.6, -65.3) -> (-16.6, -65.3)
  line L37 (-16.6, -65.3) -> (-16.6, 0)
  point P0 (-3, -50.4)
  point P1 (10.6, -65.3)
  dimension "d45" = 6
  dimension "d46" = 6
extrude "돌출16" add sketch "스케치22" against normal blind 6 contours L8 L30 L31 L32 | L14 L36 L35 L34
thicken "두껍게 하기1" operation add thickness 0.19 both sides no extend neighbours no toward (0, 0, 1) faces at (-2.1805, -25.8675, 50.4)
thicken "두껍게 하기2" operation add thickness 0.19 both sides no extend neighbours no toward (0, 0, 1) faces at (-25.9031, -2.2161, 50.4)
thicken "두껍게 하기3" operation add thickness 0.1 both sides no extend neighbours no toward (0, 0, 1) faces at (-2.1805, -25.8675, 50.59)
thicken "두껍게 하기4" operation add thickness 0.1 both sides no extend neighbours no toward (0, 0, 1) faces at (-25.9031, -2.2161, 50.59)
thicken "두껍게 하기5" operation add thickness 0.29 both sides no extend neighbours no toward (0, 0, 1) faces at (-12.6276, -14.0418, 56.4)
thicken "두껍게 하기6" operation add thickness 0.01 both sides no extend neighbours no toward (0, 0, 1) faces at (-2.1805, -25.8675, 50.69)
thicken "두껍게 하기7" operation add thickness 0.01 both sides no extend neighbours no toward (0, 0, 1) faces at (-12.6276, -14.0418, 56.69)
thicken "두껍게 하기8" operation add thickness 0.01 both sides no extend neighbours no toward (0, 0, 1) faces at (-25.9031, -2.2161, 50.69)
sketch "스케치23" plane through (-9.7991, -14.0418, -20.9) normal (0.7071068, 0.7071068, 0) x (-0.7071068, 0.7071068, 0)
  line L0 (-3.3, 66.8) -> (-10.3, 66.8) projected
  line L1 (-10.3, 66.8) -> (-10.3, 69.8) projected
  line L2 (-10.3, 69.8) -> (-3.3, 69.8) projected
  line L3 (-3.3, 69.8) -> (-3.3, 66.8) projected
  line L4 (9.3, 69.8) -> (16.3, 69.8) projected
  line L5 (16.3, 69.8) -> (16.3, 66.8) projected
  line L6 (16.3, 66.8) -> (9.3, 66.8) projected
  line L7 (9.3, 66.8) -> (9.3, 69.8) projected
  circle A0 centre (9.8, 46.8125) radius 1.35 projected
  circle A1 centre (-3.8, 46.8125) radius 1.35 projected
  circle A2 centre (9.8, 30.4875) radius 1.35 projected
  circle A3 centre (-3.8, 30.4875) radius 1.35 projected
  line L8 (6, 71.6) -> (6, 77.6) projected
  line L9 (0, 77.6) -> (6, 77.6) projected
  line L10 (0, 71.6) -> (0, 77.6) projected
  line L11 (-16.6, 71.6) -> (0, 71.6) projected
  line L12 (-16.6, 71.6) -> (-16.6, 6) projected
  line L13 (-16.6, 6) -> (0, 6) projected
  line L14 (0, 6) -> (0, 0) projected
  line L15 (0, 0) -> (6, 0) projected
  line L16 (6, 0) -> (6, 6) projected
  line L17 (6, 6) -> (22.6, 6) projected
  line L18 (22.6, 6) -> (22.6, 71.6) projected
  line L19 (6, 71.6) -> (22.6, 71.6) projected
  circle A4 centre (-3.8, 46.8125) radius 1.35 projected
  line L20 (-3.8, 46.8125) -> (-3.8, 30.4875)
  line L21 (-16.6, 71.6) -> (-16.6, 6) projected
  line L22 (-16.6, 38.8) -> (22.6, 38.8)
  line L23 (-3.3, 10.8) -> (-10.3, 10.8)
  line L24 (-10.3, 10.8) -> (-10.3, 7.8)
  line L25 (-10.3, 7.8) -> (-3.3, 7.8)
  line L26 (-3.3, 7.8) -> (-3.3, 10.8)
  line L27 (9.3, 7.8) -> (16.3, 7.8)
  line L28 (16.3, 7.8) -> (16.3, 10.8)
  line L29 (16.3, 10.8) -> (9.3, 10.8)
  line L30 (9.3, 10.8) -> (9.3, 7.8)
  line L31 (-16.6, 6) -> (0, 6)
  point P0 (3, 20.9)
extrude "돌출17" cut sketch "스케치23" against normal up to next contours L26 L25 L24 L23 | L30 L29 L28 L27
properties part number "foot_2" material "PMMA 플라스틱"
